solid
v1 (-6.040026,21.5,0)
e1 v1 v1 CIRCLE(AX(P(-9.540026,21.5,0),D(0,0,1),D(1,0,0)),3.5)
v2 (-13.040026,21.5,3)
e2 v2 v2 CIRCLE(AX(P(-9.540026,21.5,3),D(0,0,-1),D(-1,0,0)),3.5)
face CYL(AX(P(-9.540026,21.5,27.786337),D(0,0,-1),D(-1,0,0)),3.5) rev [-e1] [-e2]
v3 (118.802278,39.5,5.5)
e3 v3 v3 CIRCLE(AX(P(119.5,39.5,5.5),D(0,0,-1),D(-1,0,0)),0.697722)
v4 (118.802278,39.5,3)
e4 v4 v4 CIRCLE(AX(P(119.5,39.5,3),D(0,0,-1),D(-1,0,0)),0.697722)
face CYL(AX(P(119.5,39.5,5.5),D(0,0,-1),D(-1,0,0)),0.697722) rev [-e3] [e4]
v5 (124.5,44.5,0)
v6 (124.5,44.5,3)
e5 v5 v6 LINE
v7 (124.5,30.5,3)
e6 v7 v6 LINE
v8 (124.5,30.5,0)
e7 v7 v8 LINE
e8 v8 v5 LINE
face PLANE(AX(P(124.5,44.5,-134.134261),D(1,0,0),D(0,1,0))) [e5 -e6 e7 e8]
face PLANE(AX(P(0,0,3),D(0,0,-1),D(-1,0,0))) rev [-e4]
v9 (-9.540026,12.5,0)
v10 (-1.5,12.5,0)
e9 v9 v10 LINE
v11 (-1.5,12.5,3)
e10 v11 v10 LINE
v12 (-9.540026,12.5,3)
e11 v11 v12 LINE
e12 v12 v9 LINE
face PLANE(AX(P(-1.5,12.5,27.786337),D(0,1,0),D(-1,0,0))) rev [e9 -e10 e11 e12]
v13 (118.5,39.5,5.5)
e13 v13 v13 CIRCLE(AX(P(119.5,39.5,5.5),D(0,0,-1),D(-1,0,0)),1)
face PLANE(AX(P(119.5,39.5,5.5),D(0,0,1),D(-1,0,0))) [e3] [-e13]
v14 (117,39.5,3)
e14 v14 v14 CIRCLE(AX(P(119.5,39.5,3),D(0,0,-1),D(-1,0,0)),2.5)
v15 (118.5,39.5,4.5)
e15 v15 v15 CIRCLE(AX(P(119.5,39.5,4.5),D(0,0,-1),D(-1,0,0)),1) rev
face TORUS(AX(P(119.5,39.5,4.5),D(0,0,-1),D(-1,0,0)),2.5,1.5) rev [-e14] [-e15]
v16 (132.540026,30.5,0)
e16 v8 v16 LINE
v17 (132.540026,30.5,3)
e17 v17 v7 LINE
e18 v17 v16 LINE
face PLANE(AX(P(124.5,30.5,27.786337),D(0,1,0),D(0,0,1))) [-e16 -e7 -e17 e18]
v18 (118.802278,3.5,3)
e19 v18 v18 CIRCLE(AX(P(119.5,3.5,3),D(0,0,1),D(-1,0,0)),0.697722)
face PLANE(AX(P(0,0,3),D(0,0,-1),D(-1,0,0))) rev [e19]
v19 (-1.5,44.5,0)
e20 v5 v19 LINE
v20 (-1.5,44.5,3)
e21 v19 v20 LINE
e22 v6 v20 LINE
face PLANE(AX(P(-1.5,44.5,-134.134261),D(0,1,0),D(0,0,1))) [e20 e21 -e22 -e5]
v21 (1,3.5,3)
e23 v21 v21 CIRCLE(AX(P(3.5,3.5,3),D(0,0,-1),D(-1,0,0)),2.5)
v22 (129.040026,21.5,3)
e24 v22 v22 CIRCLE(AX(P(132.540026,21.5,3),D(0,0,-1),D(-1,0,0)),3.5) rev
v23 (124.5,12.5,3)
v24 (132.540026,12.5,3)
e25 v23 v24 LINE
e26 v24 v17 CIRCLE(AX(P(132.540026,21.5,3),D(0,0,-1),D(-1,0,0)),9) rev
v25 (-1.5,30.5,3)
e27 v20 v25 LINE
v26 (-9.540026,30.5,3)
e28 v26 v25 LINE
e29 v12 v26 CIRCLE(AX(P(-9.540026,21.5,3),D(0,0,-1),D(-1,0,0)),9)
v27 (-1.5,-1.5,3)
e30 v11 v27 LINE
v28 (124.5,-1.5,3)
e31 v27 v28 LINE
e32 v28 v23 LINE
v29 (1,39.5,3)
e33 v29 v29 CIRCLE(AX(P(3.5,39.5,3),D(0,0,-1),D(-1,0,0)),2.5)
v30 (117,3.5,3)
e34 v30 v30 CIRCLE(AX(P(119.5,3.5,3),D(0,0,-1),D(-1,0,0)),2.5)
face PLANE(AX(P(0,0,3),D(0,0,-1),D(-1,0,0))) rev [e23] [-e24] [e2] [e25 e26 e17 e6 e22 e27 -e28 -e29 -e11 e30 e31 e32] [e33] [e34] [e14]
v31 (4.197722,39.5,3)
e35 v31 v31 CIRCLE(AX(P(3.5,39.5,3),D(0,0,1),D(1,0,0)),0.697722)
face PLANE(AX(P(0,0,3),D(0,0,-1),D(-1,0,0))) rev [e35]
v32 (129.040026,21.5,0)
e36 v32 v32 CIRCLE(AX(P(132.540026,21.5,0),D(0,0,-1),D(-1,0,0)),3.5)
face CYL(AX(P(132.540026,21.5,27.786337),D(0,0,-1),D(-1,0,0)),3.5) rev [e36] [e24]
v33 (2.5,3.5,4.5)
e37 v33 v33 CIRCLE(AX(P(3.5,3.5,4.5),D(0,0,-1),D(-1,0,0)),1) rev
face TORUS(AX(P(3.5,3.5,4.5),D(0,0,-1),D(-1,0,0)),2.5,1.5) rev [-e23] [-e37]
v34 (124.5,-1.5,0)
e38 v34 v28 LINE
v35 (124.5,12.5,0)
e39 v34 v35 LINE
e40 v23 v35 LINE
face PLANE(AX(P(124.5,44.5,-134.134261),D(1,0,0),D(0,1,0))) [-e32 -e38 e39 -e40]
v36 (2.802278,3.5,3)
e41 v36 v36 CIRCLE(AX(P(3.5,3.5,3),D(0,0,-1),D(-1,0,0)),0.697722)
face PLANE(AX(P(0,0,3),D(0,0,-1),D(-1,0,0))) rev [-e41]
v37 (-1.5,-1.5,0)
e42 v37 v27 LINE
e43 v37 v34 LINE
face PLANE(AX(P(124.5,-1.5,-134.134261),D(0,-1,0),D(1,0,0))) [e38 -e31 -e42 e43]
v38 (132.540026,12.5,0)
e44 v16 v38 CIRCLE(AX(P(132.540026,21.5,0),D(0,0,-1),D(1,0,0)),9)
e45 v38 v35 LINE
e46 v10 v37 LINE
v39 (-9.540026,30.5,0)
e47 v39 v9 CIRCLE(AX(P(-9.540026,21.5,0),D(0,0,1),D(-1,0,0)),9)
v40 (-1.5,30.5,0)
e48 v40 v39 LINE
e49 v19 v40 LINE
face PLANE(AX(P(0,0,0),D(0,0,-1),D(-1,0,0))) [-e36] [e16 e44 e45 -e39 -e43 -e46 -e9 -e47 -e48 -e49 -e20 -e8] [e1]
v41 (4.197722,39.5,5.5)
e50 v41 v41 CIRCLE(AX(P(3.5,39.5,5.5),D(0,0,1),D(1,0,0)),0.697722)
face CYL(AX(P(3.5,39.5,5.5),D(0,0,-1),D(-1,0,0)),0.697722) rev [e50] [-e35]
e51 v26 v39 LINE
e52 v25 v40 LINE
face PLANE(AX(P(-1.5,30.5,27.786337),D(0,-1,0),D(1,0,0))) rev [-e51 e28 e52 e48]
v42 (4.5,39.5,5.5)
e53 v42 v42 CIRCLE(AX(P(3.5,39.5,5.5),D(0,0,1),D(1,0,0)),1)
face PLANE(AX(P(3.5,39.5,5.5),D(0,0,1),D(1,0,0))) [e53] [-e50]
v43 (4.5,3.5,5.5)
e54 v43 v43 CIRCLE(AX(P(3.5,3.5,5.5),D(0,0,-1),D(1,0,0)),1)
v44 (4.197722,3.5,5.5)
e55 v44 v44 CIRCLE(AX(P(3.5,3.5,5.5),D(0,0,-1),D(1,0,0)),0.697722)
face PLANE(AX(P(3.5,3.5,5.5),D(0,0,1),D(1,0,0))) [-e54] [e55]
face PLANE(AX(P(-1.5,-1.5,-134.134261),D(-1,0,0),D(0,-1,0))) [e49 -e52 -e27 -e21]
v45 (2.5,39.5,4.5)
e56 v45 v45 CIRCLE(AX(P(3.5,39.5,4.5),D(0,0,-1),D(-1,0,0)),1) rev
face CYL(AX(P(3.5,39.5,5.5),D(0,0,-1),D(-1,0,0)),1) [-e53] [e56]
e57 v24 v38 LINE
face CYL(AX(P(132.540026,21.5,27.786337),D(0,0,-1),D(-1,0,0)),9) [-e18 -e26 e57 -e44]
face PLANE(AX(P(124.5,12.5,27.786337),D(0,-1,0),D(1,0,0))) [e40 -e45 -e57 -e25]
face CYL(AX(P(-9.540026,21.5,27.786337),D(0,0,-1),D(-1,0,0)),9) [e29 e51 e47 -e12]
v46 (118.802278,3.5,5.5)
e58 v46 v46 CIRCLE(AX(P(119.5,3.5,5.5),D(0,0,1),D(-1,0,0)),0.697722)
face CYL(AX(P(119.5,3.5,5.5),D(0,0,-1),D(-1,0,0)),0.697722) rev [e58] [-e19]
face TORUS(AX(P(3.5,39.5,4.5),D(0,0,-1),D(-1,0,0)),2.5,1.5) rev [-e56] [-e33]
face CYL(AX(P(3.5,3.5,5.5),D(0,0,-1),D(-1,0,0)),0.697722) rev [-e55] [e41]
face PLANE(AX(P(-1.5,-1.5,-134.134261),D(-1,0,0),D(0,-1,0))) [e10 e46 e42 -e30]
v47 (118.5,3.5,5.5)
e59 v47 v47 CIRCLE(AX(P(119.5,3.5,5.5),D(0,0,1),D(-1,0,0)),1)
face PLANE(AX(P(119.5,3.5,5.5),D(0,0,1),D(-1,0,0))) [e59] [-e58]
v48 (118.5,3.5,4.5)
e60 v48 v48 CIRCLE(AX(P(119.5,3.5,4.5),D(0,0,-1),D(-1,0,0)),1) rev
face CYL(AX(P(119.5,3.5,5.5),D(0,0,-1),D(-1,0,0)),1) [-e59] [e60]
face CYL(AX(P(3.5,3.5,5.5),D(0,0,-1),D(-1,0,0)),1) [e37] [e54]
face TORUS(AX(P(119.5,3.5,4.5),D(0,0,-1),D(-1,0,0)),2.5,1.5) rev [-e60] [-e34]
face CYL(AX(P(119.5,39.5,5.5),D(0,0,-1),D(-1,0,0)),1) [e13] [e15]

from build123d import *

# Parameters (mm, degrees)
SKETCH_1_W             = 123
SKETCH_1_H             = 43
EXTRUDE_1_DEPTH        = 3
SKETCH_2_W             = 126
SKETCH_2_H             = 46
SKETCH_2_W_2           = 123
SKETCH_2_H_2           = 43
EXTRUDE_2_DEPTH        = 3
SKETCH_5_R             = 1
SKETCH_5_R_2           = 0.697721568
EXTRUDE_5_DEPTH        = 2.5
FILLET_6_R             = 1.5
FILLET_6_OF_MIRROR_1_R = 1.5
SKETCH_8_R             = 3.5
EXTRUDE_8_DEPTH        = 3


# Read off the part's stored shape, not the designer's step: Зеркальное отражение2
with BuildPart() as part:
    # Эскиз1 → Бобышка-Вытянуть1 (new body)
    with BuildSketch(Plane.XY):
        with Locations((61.5, 21.5)):
            Rectangle(SKETCH_1_W, SKETCH_1_H)
    extrude(amount=EXTRUDE_1_DEPTH)

    # Эскиз2 → Бобышка-Вытянуть2 (add)
    with BuildSketch(Plane.XY.offset(3)):
        with Locations((61.5, 21.5)):
            Rectangle(SKETCH_2_W, SKETCH_2_H)
        with Locations((61.5, 21.5)):
            Rectangle(SKETCH_2_W_2, SKETCH_2_H_2, mode=Mode.SUBTRACT)
    extrude(amount=-EXTRUDE_2_DEPTH)

    # Эскиз5 → Бобышка-Вытянуть5 (add)
    with BuildSketch(Plane.XY.offset(3)):
        with Locations(Location((3.5, 39.5, 0), (0, 0, 180))):
            Circle(SKETCH_5_R)
        with Locations((3.5, 39.5)):
            Circle(SKETCH_5_R_2, mode=Mode.SUBTRACT)
    extrude_5 = extrude(amount=EXTRUDE_5_DEPTH)

    # Скругление6
    fillet_6_edges = [part.edges().sort_by_distance(p)[0] for p in [
        (4.5, 39.5, 3),
    ]]
    fillet(fillet_6_edges, radius=FILLET_6_R)

    # Зеркальное отражение1: Бобышка-Вытянуть5 across plane
    add(extrude_5.mirror(Plane.ZY.offset(-61.5)))

    # Скругление6 of Зеркальное отражение1
    fillet_6_of_mirror_1_edges = [part.edges().sort_by_distance(p)[0] for p in [
        (118.5, 39.5, 3),
    ]]
    fillet(fillet_6_of_mirror_1_edges, radius=FILLET_6_OF_MIRROR_1_R)

    # Зеркальное отражение2 outline → Зеркальное отражение2 (revolve)
    with BuildSketch(Plane(origin=(3.5, 3.5, 0), x_dir=(1, 0, 0), z_dir=(0, -1, 0))):
        with BuildLine():
            Line((1, 5.5), (0.697721568, 5.5))
            Line((0.697721568, 5.5), (0.697721568, 3))
            Line((0.697721568, 3), (2.5, 3))
            ThreePointArc((2.5, 3), (1.439339828, 3.439339828), (1, 4.5))
            Line((1, 4.5), (1, 5.5))
        make_face()
    revolve(axis=Axis((3.5, 3.5, 0), (0, 0, 1)))

    # Mirror 2 2 outline → Mirror 2 2 (revolve)
    with BuildSketch(Plane(origin=(119.5, 3.5, 0), x_dir=(1, 0, 0), z_dir=(0, -1, 0))):
        with BuildLine():
            Line((1, 5.5), (0.697721568, 5.5))
            Line((0.697721568, 5.5), (0.697721568, 3))
            Line((0.697721568, 3), (2.5, 3))
            ThreePointArc((2.5, 3), (1.439339828, 3.439339828), (1, 4.5))
            Line((1, 4.5), (1, 5.5))
        make_face()
    revolve(axis=Axis((119.5, 3.5, 0), (0, 0, 1)))

    # Эскиз8 → Бобышка-Вытянуть8 (add)
    with BuildSketch(Plane(origin=(0, 0, 0), x_dir=(-1, 0, 0), z_dir=(0, 0, -1))):
        with BuildLine():
            Line((-124.5, 12.5), (-132.54002612, 12.5))
            ThreePointArc((-132.54002612, 12.5), (-141.54002612, 21.5), (-132.54002612, 30.5))
            Line((-132.54002612, 30.5), (-124.5, 30.5))
            Line((-124.5, 30.5), (-124.5, 12.5))
        make_face()
        with Locations((-132.54002612, 21.5)):
            Circle(SKETCH_8_R, mode=Mode.SUBTRACT)
    extrude_8 = extrude(amount=-EXTRUDE_8_DEPTH)

    # Зеркальное отражение8: Бобышка-Вытянуть8 across plane
    add(extrude_8.mirror(Plane.ZY.offset(-61.5)))


solid = part.part
